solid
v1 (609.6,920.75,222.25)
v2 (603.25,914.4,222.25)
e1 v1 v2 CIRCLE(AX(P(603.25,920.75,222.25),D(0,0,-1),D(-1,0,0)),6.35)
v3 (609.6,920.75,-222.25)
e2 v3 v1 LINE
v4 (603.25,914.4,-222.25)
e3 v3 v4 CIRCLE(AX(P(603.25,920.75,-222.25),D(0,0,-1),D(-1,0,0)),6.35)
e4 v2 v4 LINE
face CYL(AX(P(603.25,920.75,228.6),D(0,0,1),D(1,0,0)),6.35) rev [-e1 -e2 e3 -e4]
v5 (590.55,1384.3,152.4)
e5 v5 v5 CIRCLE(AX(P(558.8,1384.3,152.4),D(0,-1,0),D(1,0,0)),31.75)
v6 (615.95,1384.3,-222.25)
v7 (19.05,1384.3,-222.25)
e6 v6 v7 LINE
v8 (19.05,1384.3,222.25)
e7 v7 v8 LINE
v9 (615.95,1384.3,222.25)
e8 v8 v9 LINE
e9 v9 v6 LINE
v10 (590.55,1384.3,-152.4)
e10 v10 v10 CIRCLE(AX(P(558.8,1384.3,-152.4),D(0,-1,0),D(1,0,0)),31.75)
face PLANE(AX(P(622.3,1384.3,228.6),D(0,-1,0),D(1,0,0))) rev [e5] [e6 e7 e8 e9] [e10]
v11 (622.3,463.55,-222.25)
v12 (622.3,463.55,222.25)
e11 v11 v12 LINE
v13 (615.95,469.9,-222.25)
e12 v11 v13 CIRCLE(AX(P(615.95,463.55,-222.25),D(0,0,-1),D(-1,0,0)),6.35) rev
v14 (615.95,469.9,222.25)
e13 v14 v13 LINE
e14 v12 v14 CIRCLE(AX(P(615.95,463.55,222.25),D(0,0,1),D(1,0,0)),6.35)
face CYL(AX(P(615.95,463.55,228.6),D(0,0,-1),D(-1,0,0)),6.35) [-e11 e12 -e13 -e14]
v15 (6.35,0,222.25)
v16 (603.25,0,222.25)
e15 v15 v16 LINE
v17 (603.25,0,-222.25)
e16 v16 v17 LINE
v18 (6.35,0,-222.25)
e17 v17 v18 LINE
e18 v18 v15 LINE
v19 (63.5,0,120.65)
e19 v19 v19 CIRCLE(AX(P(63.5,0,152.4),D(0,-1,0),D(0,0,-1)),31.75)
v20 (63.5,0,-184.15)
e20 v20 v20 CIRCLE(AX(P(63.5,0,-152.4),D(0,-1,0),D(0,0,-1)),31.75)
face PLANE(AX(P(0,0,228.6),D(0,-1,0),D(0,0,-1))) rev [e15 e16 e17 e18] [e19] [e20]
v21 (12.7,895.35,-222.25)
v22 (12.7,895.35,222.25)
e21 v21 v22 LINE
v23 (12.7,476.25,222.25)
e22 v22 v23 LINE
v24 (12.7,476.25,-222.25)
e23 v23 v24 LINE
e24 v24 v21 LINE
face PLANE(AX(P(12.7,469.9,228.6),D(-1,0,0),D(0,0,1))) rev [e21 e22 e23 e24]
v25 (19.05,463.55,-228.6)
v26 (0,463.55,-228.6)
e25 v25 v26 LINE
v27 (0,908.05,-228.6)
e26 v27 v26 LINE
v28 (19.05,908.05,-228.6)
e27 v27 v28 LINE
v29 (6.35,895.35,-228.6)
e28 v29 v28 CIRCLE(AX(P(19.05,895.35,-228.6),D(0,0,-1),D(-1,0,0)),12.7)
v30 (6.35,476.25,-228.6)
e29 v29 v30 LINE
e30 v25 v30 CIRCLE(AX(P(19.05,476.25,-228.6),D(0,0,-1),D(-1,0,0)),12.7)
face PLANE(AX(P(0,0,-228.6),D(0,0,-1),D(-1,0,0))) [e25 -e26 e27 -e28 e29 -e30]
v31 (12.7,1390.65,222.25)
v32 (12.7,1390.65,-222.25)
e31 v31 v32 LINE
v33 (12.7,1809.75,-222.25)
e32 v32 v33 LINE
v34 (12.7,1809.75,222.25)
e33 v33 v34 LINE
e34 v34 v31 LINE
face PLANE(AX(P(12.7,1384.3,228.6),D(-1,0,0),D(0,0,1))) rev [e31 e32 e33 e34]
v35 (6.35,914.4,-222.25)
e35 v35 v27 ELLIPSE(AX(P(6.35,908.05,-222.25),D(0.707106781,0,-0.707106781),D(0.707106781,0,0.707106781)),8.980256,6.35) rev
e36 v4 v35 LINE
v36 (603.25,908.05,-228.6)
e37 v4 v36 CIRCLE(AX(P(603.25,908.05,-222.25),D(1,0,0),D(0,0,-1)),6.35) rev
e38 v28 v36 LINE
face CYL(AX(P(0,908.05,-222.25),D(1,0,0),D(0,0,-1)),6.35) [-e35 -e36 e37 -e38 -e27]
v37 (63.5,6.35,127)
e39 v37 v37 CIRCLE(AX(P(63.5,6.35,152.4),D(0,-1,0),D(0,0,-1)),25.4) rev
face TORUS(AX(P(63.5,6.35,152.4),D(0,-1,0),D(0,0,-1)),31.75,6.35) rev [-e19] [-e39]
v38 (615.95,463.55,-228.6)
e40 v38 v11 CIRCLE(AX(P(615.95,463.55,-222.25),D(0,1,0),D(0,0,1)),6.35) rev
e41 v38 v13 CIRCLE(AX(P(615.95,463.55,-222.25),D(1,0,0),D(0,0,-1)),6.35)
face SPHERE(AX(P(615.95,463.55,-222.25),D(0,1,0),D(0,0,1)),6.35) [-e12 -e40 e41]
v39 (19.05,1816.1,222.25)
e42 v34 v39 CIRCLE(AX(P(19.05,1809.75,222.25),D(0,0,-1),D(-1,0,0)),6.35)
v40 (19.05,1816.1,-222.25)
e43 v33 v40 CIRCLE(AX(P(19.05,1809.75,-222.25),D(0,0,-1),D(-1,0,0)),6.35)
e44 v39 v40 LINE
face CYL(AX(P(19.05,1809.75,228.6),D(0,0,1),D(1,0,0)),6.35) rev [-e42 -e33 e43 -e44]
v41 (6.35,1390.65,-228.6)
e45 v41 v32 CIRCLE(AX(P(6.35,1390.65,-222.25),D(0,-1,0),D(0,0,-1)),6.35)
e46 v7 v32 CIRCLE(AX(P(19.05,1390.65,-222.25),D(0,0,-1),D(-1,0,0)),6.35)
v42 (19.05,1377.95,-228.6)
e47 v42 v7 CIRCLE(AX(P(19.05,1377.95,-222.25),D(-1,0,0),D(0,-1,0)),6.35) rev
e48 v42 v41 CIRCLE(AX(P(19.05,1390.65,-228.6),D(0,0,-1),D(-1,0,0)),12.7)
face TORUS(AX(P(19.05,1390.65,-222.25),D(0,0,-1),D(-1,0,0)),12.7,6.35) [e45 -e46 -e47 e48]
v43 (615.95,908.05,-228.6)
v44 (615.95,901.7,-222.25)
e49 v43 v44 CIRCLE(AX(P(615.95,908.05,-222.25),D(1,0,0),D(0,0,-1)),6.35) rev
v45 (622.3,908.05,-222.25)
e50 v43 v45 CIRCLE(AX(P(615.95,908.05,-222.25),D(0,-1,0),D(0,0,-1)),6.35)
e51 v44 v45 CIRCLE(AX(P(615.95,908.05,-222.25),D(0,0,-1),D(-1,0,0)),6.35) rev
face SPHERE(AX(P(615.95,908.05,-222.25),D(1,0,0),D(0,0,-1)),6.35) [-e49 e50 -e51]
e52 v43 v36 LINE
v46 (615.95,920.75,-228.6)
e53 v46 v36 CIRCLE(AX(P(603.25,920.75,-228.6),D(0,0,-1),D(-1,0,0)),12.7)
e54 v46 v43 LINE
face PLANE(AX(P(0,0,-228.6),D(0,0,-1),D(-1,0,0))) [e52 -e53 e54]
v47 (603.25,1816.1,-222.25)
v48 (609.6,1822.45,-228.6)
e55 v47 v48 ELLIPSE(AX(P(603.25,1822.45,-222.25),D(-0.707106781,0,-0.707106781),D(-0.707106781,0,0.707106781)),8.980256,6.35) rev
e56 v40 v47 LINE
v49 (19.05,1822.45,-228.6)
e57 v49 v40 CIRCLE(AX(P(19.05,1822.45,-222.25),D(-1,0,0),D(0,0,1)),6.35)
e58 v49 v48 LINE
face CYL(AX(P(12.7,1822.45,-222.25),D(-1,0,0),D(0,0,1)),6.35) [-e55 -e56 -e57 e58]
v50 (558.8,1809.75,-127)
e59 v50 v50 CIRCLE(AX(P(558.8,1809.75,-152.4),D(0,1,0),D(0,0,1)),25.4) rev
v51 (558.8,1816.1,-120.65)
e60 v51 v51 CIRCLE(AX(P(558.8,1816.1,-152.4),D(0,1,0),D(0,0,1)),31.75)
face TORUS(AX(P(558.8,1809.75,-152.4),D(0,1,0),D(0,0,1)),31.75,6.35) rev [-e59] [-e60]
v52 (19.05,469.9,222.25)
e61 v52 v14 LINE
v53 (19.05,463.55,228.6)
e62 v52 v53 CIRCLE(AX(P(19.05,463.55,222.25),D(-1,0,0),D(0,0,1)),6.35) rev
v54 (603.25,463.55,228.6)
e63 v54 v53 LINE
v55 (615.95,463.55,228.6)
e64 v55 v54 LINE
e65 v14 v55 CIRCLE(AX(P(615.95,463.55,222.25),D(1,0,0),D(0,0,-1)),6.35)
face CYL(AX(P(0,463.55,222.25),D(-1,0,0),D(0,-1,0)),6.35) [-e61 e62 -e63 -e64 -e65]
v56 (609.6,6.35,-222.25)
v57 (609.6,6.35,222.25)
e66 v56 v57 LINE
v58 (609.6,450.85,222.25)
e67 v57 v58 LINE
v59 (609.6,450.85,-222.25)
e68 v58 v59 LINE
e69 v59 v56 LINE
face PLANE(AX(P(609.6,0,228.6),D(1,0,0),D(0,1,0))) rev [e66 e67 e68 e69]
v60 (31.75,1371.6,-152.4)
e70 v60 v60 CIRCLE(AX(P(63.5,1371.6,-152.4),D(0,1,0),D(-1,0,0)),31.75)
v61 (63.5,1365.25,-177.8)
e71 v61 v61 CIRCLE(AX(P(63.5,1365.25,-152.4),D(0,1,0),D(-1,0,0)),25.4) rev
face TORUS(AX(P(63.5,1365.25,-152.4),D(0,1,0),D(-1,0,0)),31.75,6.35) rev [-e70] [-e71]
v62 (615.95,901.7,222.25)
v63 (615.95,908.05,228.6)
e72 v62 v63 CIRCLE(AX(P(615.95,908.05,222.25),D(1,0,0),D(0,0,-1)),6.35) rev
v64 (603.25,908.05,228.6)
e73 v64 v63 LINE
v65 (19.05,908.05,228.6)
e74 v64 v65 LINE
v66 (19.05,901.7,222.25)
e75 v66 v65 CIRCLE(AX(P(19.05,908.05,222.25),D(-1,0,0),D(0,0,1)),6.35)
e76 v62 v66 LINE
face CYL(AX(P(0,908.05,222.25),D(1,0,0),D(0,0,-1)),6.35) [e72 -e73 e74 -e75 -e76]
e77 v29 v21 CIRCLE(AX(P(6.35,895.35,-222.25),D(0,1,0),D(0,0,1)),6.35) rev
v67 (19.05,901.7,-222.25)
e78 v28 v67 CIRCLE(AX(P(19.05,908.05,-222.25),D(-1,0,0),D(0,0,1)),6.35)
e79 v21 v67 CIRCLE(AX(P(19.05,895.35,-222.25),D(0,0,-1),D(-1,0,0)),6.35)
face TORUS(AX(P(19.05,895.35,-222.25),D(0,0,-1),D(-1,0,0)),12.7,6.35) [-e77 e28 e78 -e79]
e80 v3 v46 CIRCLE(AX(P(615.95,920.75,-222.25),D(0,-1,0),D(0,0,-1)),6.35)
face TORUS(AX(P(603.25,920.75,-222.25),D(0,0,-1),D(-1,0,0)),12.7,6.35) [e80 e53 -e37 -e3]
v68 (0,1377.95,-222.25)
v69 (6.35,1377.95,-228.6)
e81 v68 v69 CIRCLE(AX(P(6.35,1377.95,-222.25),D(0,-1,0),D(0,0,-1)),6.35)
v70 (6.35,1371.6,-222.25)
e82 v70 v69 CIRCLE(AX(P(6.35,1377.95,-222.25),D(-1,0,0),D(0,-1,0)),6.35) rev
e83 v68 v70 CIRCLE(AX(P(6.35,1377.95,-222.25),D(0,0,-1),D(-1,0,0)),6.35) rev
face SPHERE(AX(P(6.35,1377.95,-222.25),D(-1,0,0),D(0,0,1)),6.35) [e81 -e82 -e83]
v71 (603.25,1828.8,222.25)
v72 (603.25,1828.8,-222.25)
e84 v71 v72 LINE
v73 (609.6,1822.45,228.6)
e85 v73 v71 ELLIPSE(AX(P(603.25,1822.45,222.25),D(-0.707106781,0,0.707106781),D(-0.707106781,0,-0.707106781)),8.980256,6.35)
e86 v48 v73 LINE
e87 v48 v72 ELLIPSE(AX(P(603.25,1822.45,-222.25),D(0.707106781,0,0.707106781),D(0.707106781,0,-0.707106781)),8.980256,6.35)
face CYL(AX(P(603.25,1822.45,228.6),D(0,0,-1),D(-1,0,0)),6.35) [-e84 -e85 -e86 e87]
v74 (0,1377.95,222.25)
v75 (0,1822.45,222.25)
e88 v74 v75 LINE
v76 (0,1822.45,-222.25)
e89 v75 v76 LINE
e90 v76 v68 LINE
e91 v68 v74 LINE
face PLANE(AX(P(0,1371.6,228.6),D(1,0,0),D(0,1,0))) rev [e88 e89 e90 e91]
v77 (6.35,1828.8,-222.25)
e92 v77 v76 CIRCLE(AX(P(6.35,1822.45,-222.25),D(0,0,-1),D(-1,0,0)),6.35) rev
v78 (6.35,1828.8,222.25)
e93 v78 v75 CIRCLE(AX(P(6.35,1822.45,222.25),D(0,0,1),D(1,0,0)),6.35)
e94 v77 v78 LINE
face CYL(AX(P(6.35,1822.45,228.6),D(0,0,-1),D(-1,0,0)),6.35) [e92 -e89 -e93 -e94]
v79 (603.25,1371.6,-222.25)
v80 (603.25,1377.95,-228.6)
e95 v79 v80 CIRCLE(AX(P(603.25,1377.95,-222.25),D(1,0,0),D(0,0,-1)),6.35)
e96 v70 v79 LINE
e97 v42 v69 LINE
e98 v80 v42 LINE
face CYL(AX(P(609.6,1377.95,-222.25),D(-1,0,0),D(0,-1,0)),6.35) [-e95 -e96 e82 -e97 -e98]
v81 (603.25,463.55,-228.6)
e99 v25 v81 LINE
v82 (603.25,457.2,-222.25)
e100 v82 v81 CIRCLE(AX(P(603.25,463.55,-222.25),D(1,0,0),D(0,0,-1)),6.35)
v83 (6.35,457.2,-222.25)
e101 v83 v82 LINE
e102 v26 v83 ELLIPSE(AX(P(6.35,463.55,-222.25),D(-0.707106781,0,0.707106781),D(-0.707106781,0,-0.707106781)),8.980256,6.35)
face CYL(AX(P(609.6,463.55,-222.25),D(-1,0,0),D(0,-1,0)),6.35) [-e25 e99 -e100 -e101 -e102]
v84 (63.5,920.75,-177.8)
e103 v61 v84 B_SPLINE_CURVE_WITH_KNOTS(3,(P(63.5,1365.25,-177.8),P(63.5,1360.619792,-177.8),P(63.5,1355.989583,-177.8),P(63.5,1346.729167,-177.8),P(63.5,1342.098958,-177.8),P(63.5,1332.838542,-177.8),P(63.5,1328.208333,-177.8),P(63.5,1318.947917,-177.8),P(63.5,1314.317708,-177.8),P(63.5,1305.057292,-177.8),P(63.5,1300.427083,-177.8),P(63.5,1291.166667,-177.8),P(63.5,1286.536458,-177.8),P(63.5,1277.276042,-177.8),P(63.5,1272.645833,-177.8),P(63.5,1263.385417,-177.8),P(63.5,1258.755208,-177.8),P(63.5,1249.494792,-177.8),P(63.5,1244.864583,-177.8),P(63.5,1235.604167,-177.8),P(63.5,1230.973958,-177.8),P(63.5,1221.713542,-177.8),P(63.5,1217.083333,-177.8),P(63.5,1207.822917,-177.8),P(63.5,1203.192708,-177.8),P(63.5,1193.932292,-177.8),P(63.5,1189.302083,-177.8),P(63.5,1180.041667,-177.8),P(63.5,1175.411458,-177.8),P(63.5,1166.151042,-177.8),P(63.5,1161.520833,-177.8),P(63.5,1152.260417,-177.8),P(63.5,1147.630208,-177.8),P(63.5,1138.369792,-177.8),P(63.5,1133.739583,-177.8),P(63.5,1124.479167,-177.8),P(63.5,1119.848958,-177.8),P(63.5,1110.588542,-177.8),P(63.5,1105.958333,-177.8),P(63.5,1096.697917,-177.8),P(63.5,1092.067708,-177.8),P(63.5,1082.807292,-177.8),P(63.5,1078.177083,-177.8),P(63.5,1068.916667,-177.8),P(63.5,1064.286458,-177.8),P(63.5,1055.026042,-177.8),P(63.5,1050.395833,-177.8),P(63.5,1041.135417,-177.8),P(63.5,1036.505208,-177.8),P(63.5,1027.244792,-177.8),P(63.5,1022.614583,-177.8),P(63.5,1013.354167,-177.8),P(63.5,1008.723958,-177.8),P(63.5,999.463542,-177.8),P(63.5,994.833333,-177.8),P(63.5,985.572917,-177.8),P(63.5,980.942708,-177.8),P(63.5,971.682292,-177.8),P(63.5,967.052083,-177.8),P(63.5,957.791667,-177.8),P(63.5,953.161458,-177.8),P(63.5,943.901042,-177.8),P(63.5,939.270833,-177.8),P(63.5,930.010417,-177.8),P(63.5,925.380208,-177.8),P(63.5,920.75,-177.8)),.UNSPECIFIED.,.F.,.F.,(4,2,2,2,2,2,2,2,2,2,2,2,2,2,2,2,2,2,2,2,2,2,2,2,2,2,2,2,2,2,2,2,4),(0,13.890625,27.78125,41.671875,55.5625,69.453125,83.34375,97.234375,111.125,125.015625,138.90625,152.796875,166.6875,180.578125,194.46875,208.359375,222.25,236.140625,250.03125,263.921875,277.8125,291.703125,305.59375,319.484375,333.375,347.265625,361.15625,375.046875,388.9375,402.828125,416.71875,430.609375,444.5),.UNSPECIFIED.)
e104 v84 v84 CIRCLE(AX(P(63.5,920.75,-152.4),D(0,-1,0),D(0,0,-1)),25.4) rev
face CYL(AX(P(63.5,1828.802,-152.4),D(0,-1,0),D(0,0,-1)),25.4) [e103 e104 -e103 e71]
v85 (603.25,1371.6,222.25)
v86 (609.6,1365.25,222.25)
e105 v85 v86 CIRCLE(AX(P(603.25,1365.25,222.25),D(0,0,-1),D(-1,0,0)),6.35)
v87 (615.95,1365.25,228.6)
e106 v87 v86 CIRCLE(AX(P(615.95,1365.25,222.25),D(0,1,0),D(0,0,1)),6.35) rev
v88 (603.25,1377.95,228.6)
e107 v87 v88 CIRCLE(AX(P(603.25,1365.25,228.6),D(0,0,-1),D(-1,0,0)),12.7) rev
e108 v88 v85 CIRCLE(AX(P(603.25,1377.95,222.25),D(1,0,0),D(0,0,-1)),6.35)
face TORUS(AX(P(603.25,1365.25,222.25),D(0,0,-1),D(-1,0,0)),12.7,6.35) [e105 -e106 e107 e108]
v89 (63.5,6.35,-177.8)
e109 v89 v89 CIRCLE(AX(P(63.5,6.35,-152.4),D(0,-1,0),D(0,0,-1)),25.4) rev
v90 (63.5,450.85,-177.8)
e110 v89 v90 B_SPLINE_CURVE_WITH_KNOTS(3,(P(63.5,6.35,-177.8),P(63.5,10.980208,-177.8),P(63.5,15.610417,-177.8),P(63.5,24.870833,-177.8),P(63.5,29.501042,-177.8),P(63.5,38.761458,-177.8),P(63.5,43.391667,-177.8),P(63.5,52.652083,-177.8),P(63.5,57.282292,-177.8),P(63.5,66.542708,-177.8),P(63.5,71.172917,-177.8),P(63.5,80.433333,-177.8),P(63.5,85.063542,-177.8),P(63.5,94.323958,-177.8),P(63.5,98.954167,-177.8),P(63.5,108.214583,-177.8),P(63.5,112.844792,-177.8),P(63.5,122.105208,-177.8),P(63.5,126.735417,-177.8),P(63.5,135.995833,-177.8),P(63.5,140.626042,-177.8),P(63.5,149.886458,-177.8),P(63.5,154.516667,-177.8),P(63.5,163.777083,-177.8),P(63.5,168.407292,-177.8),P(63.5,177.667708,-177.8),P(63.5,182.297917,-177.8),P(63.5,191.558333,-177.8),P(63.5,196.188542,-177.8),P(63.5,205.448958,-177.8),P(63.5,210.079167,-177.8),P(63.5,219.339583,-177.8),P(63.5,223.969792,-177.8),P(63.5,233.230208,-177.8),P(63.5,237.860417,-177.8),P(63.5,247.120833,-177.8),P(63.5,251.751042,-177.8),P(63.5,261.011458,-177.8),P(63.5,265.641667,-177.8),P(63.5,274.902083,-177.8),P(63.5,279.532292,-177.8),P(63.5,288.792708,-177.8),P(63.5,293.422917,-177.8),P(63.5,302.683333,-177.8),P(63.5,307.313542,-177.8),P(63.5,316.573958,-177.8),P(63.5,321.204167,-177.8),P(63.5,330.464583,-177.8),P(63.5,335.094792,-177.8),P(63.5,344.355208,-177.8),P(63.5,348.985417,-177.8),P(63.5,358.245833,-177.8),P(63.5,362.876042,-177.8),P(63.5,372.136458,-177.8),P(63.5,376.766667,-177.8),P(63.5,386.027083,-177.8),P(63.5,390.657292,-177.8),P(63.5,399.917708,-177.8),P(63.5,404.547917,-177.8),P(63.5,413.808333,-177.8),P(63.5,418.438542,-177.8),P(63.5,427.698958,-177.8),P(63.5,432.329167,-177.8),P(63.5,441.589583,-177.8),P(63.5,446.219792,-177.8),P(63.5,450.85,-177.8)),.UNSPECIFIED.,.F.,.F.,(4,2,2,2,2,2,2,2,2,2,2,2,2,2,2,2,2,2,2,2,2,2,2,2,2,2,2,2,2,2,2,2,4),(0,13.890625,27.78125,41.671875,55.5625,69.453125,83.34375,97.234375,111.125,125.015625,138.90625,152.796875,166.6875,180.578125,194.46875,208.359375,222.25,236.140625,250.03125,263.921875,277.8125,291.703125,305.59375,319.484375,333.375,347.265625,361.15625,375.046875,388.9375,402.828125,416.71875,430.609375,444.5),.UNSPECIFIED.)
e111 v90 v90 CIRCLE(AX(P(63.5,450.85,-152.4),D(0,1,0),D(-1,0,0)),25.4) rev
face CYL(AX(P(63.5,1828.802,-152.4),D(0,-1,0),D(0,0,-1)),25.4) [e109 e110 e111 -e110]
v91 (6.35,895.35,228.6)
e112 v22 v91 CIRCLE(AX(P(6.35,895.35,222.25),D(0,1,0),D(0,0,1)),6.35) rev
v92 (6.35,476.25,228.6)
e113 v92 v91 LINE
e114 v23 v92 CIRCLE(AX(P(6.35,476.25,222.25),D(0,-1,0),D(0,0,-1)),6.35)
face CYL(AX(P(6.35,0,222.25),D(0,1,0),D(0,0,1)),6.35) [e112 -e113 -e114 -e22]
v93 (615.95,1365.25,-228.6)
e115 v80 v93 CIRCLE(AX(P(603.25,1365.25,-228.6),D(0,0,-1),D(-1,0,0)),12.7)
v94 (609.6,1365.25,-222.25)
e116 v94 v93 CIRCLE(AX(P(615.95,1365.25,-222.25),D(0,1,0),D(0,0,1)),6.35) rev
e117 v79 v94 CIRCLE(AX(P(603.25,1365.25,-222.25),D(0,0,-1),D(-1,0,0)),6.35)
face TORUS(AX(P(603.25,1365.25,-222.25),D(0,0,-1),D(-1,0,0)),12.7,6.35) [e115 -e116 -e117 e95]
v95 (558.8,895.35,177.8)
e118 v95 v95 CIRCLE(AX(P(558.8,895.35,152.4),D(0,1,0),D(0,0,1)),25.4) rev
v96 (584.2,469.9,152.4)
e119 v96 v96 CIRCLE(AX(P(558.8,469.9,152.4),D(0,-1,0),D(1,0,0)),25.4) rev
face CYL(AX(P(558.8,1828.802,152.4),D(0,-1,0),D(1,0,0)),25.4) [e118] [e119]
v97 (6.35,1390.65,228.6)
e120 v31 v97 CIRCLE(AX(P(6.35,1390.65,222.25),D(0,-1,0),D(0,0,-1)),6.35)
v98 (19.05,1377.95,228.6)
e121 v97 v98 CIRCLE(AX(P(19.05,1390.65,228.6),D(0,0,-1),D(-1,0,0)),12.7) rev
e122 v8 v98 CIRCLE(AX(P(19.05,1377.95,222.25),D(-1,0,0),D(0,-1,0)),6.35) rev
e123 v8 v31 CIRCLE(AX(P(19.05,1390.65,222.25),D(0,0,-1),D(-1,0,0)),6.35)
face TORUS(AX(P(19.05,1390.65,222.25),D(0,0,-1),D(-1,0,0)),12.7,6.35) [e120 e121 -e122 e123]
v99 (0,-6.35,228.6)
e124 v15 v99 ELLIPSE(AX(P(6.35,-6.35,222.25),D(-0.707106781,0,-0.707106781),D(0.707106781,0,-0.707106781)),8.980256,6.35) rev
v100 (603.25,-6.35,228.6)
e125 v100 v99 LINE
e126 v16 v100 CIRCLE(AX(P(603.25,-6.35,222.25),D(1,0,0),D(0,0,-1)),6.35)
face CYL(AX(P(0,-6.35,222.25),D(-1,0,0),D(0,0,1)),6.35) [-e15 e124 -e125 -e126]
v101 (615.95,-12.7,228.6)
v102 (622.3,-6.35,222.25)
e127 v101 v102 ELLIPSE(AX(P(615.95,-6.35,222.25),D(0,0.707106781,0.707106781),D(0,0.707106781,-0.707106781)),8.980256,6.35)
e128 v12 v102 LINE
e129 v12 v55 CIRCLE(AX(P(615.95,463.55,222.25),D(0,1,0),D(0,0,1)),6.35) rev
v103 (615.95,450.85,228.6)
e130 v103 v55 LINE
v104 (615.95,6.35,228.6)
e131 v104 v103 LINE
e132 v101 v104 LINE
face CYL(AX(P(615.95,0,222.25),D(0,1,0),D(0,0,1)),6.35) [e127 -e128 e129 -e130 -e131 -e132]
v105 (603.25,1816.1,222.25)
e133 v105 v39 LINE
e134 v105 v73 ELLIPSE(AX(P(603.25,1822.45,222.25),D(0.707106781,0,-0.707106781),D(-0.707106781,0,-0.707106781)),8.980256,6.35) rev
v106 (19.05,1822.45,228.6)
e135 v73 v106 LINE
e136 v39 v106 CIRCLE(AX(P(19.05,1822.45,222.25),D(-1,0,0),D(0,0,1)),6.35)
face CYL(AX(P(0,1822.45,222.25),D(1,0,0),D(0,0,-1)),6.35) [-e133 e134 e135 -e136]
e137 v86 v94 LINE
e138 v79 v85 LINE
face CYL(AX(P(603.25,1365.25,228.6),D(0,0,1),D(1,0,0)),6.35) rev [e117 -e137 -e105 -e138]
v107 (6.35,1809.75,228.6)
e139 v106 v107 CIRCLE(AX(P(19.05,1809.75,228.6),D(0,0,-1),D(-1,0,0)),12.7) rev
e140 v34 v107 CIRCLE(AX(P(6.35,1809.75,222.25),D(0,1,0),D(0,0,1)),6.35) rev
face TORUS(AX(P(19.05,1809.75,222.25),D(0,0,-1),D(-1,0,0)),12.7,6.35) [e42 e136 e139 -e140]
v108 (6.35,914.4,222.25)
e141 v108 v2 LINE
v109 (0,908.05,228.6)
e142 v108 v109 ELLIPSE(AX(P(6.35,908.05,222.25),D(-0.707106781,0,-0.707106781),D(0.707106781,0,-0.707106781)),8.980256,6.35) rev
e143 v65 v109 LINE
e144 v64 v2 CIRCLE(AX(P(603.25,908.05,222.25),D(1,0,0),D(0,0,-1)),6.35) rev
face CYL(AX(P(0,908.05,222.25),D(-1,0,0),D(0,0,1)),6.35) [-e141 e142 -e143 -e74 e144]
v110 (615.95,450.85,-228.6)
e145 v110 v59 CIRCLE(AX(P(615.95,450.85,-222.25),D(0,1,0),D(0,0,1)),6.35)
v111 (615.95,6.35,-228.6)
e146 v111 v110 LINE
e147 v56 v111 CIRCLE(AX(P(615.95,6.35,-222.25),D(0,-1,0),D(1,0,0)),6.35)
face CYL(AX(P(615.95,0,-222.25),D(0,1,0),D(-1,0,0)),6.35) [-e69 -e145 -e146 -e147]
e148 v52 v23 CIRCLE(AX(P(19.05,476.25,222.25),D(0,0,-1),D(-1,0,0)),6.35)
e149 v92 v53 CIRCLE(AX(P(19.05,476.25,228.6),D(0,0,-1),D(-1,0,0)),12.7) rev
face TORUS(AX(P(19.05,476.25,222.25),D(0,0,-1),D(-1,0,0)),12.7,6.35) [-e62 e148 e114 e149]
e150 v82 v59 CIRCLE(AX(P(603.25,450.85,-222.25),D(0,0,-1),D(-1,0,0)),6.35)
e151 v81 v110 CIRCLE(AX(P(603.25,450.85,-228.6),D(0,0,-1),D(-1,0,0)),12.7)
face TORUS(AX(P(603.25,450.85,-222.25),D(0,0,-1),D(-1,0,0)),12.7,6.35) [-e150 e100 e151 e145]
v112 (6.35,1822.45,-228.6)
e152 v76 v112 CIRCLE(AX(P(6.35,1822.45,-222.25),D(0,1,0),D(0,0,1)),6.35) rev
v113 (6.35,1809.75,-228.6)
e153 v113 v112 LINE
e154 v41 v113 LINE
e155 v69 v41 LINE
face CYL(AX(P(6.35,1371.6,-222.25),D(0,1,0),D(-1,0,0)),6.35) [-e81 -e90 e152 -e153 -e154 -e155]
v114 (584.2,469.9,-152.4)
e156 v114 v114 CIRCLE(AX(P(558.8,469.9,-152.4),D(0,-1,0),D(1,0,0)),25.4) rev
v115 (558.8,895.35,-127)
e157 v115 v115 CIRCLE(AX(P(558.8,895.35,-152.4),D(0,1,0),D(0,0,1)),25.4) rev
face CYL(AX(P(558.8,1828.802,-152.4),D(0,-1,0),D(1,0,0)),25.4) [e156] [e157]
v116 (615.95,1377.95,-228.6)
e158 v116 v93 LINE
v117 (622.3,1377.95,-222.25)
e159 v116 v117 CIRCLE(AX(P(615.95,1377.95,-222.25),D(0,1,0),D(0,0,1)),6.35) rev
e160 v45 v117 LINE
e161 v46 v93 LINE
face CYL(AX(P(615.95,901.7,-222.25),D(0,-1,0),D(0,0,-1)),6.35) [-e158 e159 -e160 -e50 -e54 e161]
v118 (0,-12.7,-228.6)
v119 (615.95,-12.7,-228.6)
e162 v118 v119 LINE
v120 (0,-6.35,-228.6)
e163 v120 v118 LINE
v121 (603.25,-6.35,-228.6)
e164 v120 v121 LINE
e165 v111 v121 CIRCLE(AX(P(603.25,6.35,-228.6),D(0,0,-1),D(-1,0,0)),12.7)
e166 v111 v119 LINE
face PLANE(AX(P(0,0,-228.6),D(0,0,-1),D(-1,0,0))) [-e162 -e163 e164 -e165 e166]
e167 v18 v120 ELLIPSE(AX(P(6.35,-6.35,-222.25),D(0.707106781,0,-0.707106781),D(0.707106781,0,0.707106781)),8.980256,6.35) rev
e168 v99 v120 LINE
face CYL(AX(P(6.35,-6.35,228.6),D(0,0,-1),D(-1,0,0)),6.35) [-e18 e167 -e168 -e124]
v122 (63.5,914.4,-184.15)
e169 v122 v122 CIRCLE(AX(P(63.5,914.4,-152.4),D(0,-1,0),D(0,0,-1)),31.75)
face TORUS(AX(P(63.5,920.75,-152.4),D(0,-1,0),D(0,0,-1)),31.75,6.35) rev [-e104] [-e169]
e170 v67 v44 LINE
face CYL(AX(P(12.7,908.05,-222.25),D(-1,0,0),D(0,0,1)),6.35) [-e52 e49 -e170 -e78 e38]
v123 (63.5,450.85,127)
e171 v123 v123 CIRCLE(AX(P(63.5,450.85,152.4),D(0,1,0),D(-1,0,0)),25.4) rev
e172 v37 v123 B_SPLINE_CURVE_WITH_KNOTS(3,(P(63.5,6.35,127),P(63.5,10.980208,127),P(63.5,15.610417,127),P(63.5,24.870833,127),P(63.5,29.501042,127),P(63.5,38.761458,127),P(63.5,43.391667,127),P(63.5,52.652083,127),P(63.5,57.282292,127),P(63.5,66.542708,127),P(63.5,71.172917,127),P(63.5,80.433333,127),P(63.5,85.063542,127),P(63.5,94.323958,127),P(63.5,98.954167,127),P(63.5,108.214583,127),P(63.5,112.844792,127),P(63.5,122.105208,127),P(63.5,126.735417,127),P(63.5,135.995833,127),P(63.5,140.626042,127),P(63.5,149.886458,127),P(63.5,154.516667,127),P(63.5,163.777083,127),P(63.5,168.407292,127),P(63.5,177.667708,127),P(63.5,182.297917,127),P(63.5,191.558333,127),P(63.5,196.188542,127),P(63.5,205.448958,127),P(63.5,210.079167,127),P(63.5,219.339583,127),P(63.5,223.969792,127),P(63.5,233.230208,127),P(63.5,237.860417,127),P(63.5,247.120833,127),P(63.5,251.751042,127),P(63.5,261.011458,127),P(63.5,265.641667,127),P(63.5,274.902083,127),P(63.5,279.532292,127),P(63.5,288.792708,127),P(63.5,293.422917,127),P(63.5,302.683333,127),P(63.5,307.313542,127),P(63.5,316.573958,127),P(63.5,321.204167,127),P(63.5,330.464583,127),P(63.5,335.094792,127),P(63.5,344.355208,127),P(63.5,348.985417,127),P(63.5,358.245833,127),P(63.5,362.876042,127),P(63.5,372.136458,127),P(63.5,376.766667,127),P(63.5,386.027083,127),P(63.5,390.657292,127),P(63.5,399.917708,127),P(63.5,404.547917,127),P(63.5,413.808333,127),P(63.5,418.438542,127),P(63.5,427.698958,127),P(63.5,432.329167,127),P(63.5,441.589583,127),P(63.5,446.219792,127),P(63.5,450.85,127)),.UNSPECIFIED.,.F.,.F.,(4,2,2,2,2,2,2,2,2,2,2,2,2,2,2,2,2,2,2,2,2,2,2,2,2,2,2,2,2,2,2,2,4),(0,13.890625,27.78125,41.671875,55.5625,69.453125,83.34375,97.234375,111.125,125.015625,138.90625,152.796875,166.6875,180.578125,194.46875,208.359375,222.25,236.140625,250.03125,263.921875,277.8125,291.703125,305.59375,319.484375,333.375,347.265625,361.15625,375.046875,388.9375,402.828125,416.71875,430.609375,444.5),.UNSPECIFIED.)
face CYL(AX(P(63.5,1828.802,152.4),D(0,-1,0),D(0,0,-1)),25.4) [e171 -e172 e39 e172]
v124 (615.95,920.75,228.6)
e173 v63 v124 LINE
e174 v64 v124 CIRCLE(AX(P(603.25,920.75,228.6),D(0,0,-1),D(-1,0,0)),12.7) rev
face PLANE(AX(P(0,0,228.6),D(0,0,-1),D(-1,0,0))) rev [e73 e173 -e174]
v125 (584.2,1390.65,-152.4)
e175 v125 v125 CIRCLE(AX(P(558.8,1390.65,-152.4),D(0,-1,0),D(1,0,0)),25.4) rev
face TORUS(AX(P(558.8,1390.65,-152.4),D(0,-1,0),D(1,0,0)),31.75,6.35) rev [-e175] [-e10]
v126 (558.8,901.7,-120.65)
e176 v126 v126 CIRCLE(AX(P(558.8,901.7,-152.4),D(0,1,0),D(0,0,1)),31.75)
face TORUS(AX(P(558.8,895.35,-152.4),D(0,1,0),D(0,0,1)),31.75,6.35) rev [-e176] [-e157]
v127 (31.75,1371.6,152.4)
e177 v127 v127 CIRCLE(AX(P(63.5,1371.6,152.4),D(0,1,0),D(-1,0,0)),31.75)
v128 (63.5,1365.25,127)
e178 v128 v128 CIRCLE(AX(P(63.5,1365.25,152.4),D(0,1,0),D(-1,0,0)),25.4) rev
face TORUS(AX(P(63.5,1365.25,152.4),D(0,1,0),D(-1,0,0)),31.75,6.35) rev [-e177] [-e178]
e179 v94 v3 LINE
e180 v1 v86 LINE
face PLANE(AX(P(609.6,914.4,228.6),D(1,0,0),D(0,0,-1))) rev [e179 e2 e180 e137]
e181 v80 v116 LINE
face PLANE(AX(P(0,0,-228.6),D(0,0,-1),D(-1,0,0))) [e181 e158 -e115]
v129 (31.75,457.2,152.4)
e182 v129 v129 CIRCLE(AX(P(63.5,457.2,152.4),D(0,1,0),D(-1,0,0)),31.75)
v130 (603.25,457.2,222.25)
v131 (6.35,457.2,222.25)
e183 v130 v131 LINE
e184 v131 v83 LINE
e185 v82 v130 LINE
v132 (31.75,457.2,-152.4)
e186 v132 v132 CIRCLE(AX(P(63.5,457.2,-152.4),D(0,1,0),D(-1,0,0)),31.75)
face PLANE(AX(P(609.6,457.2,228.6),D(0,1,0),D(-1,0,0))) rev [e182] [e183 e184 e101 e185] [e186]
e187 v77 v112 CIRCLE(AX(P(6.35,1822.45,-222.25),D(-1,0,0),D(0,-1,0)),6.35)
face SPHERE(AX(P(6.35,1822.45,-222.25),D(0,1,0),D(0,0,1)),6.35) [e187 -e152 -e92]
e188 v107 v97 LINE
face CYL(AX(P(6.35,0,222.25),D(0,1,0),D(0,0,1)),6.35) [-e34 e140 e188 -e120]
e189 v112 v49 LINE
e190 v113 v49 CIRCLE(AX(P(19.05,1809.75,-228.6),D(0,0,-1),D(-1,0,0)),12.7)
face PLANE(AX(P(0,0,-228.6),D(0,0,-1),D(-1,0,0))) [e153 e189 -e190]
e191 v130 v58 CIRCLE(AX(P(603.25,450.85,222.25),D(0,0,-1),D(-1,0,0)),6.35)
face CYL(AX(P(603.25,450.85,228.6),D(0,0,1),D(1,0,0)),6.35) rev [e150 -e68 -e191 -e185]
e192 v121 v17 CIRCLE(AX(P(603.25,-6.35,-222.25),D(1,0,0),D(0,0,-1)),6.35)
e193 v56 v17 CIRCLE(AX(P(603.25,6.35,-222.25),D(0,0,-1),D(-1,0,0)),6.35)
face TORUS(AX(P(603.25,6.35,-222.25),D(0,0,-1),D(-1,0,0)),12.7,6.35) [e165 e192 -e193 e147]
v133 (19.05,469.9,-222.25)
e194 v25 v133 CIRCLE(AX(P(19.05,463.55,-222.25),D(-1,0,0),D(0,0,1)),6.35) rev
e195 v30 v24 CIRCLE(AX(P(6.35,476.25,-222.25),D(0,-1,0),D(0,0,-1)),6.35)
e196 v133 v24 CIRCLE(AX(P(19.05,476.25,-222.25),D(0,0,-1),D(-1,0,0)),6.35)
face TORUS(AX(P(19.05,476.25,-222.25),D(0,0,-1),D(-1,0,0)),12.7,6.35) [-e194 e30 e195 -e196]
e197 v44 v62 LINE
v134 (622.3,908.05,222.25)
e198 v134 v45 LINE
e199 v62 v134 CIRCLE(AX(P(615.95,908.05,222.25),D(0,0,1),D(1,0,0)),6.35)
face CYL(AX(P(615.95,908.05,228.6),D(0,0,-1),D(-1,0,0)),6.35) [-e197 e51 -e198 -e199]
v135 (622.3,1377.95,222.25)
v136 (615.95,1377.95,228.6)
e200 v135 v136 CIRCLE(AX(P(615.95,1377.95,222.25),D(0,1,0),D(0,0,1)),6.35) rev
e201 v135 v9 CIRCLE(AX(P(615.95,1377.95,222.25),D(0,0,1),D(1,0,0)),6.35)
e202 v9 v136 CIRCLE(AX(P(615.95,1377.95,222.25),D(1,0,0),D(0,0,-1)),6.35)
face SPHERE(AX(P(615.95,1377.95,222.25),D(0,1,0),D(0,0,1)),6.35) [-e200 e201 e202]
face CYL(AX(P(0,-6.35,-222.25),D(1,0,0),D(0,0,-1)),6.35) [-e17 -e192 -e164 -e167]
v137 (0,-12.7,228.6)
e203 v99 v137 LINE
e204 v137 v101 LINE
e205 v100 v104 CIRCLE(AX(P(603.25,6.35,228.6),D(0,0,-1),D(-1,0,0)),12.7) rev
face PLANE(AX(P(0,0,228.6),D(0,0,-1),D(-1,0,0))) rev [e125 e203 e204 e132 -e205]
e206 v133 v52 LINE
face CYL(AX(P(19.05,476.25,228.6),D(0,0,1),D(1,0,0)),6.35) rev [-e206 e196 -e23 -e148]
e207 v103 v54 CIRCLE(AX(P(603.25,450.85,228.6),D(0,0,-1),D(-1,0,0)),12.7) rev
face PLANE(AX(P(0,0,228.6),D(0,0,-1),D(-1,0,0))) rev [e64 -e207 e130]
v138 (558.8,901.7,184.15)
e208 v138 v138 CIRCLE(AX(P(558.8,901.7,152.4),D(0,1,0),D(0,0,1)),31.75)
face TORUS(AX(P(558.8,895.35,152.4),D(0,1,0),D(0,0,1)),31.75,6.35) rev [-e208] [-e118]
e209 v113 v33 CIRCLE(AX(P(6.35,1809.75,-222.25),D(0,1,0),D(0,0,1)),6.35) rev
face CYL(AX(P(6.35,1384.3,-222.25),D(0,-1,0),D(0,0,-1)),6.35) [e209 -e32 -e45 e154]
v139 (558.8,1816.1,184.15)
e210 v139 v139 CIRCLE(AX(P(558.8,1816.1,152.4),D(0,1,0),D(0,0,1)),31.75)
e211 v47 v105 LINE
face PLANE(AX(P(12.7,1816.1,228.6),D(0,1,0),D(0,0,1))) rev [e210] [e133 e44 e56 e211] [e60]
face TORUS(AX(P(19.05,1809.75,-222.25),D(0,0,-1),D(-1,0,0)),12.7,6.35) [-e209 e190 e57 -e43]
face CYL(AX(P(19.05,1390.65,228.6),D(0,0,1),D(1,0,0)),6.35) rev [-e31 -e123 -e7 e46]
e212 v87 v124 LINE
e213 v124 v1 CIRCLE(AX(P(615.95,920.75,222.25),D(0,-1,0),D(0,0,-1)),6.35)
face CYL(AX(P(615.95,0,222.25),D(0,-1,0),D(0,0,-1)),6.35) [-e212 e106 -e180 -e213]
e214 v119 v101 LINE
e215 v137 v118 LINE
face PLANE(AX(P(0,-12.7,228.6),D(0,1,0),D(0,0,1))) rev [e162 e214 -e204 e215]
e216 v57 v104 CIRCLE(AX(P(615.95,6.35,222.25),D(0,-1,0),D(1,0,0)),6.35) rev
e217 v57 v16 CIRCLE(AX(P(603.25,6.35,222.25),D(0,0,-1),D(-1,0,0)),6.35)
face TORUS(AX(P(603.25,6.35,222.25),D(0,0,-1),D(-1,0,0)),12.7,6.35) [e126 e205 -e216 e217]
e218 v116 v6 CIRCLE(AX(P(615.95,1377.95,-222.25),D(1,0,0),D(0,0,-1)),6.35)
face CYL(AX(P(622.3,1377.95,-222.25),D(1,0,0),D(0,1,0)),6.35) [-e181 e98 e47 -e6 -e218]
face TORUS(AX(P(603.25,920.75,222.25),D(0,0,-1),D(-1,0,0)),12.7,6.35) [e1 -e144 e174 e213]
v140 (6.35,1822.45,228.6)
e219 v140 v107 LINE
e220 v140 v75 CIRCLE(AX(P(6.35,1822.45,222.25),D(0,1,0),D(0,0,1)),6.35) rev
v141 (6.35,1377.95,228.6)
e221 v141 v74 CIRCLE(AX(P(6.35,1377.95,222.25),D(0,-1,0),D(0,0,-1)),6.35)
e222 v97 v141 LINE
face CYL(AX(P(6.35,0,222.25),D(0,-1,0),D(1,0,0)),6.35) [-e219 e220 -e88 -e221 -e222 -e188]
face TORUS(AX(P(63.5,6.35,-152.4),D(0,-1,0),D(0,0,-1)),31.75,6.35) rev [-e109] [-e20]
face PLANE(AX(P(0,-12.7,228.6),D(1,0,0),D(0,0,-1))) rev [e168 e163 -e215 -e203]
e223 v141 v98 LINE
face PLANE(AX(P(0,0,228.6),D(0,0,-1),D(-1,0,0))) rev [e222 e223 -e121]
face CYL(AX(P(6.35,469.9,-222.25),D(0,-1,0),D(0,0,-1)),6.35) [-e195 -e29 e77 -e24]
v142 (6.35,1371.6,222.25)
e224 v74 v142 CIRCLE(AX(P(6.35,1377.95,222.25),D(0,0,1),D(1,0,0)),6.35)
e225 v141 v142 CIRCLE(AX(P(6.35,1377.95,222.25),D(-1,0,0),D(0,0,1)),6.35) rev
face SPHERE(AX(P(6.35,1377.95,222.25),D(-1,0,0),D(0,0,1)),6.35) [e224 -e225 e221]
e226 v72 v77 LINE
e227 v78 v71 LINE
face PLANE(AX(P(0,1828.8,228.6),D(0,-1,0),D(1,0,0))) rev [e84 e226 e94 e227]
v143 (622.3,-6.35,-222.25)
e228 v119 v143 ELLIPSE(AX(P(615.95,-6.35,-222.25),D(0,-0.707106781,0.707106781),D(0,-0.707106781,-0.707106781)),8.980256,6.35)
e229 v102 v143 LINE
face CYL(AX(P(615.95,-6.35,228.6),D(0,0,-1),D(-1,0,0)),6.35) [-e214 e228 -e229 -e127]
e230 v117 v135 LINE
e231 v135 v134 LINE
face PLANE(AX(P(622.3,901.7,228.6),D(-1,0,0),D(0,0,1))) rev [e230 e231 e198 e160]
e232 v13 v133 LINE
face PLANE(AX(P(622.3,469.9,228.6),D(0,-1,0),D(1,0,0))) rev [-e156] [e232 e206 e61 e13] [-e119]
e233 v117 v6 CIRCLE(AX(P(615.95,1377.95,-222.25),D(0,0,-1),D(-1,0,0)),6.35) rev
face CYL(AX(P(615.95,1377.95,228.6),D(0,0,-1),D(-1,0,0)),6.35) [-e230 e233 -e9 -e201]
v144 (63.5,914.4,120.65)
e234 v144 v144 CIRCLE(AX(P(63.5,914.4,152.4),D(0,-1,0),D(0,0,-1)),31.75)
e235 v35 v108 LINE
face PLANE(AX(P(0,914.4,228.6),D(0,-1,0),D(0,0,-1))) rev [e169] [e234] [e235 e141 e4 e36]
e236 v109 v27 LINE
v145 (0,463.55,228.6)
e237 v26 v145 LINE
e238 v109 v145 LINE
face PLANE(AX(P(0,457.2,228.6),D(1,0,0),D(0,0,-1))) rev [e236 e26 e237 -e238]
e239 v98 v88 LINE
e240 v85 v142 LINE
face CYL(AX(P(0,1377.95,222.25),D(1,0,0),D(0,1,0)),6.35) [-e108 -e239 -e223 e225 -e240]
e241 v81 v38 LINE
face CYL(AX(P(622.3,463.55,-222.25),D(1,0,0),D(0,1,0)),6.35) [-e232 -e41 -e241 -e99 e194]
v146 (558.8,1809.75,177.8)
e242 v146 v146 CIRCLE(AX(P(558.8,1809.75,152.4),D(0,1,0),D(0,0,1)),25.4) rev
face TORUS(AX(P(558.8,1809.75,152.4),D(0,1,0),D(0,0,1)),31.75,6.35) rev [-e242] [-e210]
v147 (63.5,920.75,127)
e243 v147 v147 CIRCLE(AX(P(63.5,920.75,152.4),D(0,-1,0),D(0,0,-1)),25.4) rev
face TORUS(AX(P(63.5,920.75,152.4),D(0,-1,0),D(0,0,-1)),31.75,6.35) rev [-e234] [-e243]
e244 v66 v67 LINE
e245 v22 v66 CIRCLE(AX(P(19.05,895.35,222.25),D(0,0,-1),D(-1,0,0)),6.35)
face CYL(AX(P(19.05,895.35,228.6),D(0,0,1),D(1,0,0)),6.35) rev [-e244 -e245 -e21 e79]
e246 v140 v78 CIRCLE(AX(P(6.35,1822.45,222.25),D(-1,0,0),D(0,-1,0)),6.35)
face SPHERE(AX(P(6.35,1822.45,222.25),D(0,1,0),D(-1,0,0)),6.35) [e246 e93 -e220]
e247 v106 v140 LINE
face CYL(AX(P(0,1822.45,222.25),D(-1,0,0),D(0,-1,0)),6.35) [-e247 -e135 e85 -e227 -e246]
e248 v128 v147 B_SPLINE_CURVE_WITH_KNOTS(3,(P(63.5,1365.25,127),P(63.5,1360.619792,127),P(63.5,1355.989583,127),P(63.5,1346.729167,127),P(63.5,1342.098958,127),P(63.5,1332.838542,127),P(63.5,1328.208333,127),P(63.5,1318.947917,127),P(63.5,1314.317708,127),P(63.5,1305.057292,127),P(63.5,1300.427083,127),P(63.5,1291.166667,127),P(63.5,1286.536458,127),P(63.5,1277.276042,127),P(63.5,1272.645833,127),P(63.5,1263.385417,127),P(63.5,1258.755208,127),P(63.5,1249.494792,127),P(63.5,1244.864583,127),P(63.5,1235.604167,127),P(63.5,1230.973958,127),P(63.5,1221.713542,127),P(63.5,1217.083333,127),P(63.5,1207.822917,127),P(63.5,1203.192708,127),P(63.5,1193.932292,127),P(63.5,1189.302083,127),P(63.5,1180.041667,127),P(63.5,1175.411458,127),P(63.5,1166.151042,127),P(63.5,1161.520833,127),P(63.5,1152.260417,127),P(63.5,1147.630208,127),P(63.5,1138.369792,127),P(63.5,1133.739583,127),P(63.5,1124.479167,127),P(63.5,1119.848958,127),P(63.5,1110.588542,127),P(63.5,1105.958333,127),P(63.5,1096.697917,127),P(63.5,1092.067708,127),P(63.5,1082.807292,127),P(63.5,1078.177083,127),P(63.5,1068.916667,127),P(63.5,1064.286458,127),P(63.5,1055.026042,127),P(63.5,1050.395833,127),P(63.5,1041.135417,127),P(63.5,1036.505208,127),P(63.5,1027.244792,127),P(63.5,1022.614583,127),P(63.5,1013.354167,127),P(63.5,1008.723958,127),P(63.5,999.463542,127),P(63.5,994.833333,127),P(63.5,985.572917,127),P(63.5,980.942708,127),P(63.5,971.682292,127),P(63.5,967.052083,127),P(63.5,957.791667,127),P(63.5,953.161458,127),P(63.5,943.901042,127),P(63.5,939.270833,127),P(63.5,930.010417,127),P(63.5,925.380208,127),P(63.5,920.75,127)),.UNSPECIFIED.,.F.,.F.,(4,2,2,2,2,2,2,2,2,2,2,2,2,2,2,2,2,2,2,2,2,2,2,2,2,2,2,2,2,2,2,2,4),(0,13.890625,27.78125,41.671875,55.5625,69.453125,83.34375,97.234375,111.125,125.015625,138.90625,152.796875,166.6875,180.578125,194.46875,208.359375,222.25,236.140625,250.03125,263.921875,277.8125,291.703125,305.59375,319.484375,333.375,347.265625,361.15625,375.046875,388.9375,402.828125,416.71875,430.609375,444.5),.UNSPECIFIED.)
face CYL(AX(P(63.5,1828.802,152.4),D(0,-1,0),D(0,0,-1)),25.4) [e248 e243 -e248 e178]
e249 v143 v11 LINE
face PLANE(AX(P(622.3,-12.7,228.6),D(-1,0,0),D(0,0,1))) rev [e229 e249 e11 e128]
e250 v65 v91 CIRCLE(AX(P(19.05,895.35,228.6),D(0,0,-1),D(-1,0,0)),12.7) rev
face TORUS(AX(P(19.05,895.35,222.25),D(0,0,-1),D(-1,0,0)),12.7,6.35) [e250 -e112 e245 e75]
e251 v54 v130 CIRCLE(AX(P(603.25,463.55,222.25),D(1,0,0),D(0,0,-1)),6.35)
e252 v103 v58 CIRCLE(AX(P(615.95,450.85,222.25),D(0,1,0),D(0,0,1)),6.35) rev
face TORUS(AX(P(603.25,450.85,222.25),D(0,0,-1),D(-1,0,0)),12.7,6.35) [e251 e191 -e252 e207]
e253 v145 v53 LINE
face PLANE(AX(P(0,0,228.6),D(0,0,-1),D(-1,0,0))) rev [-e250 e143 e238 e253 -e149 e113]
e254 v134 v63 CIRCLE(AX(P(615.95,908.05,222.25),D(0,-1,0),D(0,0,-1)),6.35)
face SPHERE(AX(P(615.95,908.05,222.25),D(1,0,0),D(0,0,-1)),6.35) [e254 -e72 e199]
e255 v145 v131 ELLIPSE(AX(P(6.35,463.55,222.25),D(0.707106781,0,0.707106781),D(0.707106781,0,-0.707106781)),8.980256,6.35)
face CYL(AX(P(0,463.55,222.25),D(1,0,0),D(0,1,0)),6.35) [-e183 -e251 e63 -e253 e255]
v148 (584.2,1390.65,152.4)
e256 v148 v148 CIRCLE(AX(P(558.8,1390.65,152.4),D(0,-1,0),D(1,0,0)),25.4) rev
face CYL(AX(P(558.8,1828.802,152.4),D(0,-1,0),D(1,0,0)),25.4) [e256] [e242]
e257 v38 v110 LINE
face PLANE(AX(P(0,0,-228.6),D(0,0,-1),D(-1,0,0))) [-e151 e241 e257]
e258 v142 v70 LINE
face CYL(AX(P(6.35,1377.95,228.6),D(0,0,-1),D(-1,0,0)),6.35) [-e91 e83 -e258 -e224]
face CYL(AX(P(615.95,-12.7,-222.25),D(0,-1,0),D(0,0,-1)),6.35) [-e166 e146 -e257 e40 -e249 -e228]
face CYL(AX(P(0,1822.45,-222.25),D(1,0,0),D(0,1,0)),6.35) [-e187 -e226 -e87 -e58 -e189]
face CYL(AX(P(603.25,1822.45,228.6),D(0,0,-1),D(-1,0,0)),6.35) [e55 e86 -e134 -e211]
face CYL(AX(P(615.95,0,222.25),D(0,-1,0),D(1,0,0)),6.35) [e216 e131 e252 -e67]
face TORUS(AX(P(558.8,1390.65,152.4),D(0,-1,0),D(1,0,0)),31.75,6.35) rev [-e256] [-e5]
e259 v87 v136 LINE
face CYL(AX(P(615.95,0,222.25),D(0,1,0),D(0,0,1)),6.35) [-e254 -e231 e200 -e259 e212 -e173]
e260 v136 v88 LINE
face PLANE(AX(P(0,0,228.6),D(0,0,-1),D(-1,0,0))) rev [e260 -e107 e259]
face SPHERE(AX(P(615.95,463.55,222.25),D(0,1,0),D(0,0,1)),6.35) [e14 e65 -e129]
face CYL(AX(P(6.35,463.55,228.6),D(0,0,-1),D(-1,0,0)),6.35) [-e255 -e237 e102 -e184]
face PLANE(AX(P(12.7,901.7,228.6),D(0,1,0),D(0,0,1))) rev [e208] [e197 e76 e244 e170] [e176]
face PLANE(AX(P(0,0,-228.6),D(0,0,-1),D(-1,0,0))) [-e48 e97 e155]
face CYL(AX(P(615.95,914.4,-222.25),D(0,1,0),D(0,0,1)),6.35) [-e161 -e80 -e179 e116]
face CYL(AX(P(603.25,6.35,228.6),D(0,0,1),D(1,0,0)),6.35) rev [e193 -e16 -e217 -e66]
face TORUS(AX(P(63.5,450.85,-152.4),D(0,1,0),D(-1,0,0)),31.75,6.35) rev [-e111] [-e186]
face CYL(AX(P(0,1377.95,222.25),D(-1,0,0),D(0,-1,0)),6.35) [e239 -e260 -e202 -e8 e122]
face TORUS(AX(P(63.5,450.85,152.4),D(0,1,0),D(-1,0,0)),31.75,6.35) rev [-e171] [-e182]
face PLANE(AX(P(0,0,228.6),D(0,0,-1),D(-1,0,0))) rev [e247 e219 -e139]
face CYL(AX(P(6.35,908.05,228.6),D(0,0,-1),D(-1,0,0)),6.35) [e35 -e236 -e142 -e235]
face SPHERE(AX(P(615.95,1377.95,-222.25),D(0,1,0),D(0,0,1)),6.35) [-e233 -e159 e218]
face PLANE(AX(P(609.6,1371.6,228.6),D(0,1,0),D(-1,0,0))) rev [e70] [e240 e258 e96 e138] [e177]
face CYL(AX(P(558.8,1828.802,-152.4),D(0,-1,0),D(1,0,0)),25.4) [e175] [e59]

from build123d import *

# Parameters (mm, degrees)
BOSS_EXTRUDE1_DEPTH = 228.6
BOSS_EXTRUDE2_REACH = 1947.257
SKETCH2_R           = 25.4
LPATTERN1_COUNT     = 2
LPATTERN1_PITCH     = 914.4
BOSS_EXTRUDE3_REACH = 1513.994
SKETCH3_R           = 25.4
LPATTERN2_COUNT     = 2
LPATTERN2_PITCH     = 914.4
FILLET1_R           = 6.35


with BuildPart() as part:
    # Sketch1 → Boss-Extrude1 (new, symmetric)
    with BuildSketch(Plane.XY):
        Polygon((0, 0), (609.6, 0), (609.6, 457.2), (0, 457.2), (0, 914.4), (609.6, 914.4), (609.6, 1371.6), (0, 1371.6), (0, 1828.8), (609.6, 1828.8), (609.6, 1816.1), (12.7, 1816.1), (12.7, 1384.3), (622.3, 1384.3), (622.3, 901.7), (12.7, 901.7), (12.7, 469.9), (622.3, 469.9), (622.3, -12.7), (0, -12.7), align=None)
    extrude(amount=BOSS_EXTRUDE1_DEPTH, both=True)

    # Sketch2 → Boss-Extrude2 (add, up to next)
    with BuildSketch(Plane(origin=(0, 0, 0), x_dir=(1, 0, 0), z_dir=(0, 1, 0)), mode=Mode.PRIVATE) as boss_extrude2_sk1:
        with Locations(Location((63.5, 152.4, 0), (0, 0, 90))):
            Circle(SKETCH2_R)
    boss_extrude2_tool1 = extrude(boss_extrude2_sk1.sketch, amount=BOSS_EXTRUDE2_REACH, mode=Mode.PRIVATE) - part.part
    # Sketch2 → Boss-Extrude2 (add, up to next)
    with BuildSketch(Plane(origin=(0, 0, 0), x_dir=(1, 0, 0), z_dir=(0, 1, 0)), mode=Mode.PRIVATE) as boss_extrude2_sk2:
        with Locations(Location((63.5, -152.4, 0), (0, 0, 90))):
            Circle(SKETCH2_R)
    boss_extrude2_tool2 = extrude(boss_extrude2_sk2.sketch, amount=BOSS_EXTRUDE2_REACH, mode=Mode.PRIVATE) - part.part
    boss_extrude2_1 = boss_extrude2_tool1.solids().sort_by_distance((63.5, 0, -152.4))[0]
    add(boss_extrude2_1)
    boss_extrude2_2 = boss_extrude2_tool2.solids().sort_by_distance((63.5, 0, 152.4))[0]
    add(boss_extrude2_2)
    boss_extrude2 = boss_extrude2_1 + boss_extrude2_2  # Boss-Extrude2 as one shape, for the pattern or mirror that repeats it

    # LPattern1: Boss-Extrude2 ×2
    with Locations(*[(0, i * LPATTERN1_PITCH, 0) for i in range(1, LPATTERN1_COUNT)]):
        add(boss_extrude2)

    # Sketch3 → Boss-Extrude3 (add, up to next)
    with BuildSketch(Plane(origin=(0, 469.9, 0), x_dir=(1, 0, 0), z_dir=(0, 1, 0)), mode=Mode.PRIVATE) as boss_extrude3_sk1:
        with Locations((558.8, 152.4)):
            Circle(SKETCH3_R)
    boss_extrude3_tool1 = extrude(boss_extrude3_sk1.sketch, amount=BOSS_EXTRUDE3_REACH, mode=Mode.PRIVATE) - part.part
    # Sketch3 → Boss-Extrude3 (add, up to next)
    with BuildSketch(Plane(origin=(0, 469.9, 0), x_dir=(1, 0, 0), z_dir=(0, 1, 0)), mode=Mode.PRIVATE) as boss_extrude3_sk2:
        with Locations((558.8, -152.4)):
            Circle(SKETCH3_R)
    boss_extrude3_tool2 = extrude(boss_extrude3_sk2.sketch, amount=BOSS_EXTRUDE3_REACH, mode=Mode.PRIVATE) - part.part
    boss_extrude3_1 = boss_extrude3_tool1.solids().sort_by_distance((558.8, 469.9, -152.4))[0]
    add(boss_extrude3_1)
    boss_extrude3_2 = boss_extrude3_tool2.solids().sort_by_distance((558.8, 469.9, 152.4))[0]
    add(boss_extrude3_2)
    boss_extrude3 = boss_extrude3_1 + boss_extrude3_2  # Boss-Extrude3 as one shape, for the pattern or mirror that repeats it

    # LPattern2: Boss-Extrude3 ×2
    with Locations(*[(0, i * LPATTERN2_PITCH, 0) for i in range(1, LPATTERN2_COUNT)]):
        add(boss_extrude3)

    # Fillet1
    fillet1_edges = [part.edges().sort_by_distance(p)[0] for p in [
        (609.6, 228.6, 228.6),
        (609.6, 228.6, -228.6),
        (317.5, 469.9, 228.6),
        (317.5, 469.9, -228.6),
        (609.6, 1143, 228.6),
        (609.6, 1143, -228.6),
        (12.7, 1600.2, 228.6),
        (12.7, 1600.2, -228.6),
        (622.3, -12.7, 0),
        (622.3, 228.6, 228.6),
        (622.3, 469.9, 0),
        (622.3, 228.6, -228.6),
        (609.6, 0, 0),
        (304.8, 0, 228.6),
        (0, 0, 0),
        (304.8, 0, -228.6),
        (63.5, 0, -127),
        (63.5, 0, 177.8),
        (0, 457.2, 0),
        (304.8, 457.2, 228.6),
        (609.6, 457.2, 0),
        (304.8, 457.2, -228.6),
        (63.5, 457.2, -127),
        (63.5, 457.2, 177.8),
        (12.7, 469.9, 0),
        (12.7, 685.8, 228.6),
        (12.7, 685.8, -228.6),
        (12.7, 901.7, 0),
        (317.5, 901.7, 228.6),
        (317.5, 901.7, -228.6),
        (533.4, 901.7, -152.4),
        (533.4, 901.7, 152.4),
        (304.8, 1371.6, 228.6),
        (609.6, 1371.6, 0),
        (304.8, 1371.6, -228.6),
        (63.5, 1371.6, -127),
        (63.5, 1371.6, 177.8),
        (0, 1600.2, 228.6),
        (0, 1371.6, 0),
        (0, 1600.2, -228.6),
        (622.3, 901.7, 0),
        (622.3, 1143, 228.6),
        (622.3, 1143, -228.6),
        (609.6, 914.4, 0),
        (304.8, 914.4, 228.6),
        (0, 914.4, 0),
        (304.8, 914.4, -228.6),
        (63.5, 914.4, -127),
        (63.5, 914.4, 177.8),
        (622.3, 1384.3, 0),
        (317.5, 1384.3, 228.6),
        (12.7, 1384.3, 0),
        (317.5, 1384.3, -228.6),
        (533.4, 1384.3, -152.4),
        (533.4, 1384.3, 152.4),
        (12.7, 1816.1, 0),
        (311.15, 1816.1, 228.6),
        (609.6, 1816.1, 0),
        (311.15, 1816.1, -228.6),
        (533.4, 1816.1, -152.4),
        (533.4, 1816.1, 152.4),
        (609.6, 1828.8, 0),
        (304.8, 1828.8, 228.6),
        (0, 1828.8, 0),
        (304.8, 1828.8, -228.6),
    ]]
    fillet(fillet1_edges, radius=FILLET1_R - 0.0001)  # a hair under: the kernel refuses the full size


solid = part.part
